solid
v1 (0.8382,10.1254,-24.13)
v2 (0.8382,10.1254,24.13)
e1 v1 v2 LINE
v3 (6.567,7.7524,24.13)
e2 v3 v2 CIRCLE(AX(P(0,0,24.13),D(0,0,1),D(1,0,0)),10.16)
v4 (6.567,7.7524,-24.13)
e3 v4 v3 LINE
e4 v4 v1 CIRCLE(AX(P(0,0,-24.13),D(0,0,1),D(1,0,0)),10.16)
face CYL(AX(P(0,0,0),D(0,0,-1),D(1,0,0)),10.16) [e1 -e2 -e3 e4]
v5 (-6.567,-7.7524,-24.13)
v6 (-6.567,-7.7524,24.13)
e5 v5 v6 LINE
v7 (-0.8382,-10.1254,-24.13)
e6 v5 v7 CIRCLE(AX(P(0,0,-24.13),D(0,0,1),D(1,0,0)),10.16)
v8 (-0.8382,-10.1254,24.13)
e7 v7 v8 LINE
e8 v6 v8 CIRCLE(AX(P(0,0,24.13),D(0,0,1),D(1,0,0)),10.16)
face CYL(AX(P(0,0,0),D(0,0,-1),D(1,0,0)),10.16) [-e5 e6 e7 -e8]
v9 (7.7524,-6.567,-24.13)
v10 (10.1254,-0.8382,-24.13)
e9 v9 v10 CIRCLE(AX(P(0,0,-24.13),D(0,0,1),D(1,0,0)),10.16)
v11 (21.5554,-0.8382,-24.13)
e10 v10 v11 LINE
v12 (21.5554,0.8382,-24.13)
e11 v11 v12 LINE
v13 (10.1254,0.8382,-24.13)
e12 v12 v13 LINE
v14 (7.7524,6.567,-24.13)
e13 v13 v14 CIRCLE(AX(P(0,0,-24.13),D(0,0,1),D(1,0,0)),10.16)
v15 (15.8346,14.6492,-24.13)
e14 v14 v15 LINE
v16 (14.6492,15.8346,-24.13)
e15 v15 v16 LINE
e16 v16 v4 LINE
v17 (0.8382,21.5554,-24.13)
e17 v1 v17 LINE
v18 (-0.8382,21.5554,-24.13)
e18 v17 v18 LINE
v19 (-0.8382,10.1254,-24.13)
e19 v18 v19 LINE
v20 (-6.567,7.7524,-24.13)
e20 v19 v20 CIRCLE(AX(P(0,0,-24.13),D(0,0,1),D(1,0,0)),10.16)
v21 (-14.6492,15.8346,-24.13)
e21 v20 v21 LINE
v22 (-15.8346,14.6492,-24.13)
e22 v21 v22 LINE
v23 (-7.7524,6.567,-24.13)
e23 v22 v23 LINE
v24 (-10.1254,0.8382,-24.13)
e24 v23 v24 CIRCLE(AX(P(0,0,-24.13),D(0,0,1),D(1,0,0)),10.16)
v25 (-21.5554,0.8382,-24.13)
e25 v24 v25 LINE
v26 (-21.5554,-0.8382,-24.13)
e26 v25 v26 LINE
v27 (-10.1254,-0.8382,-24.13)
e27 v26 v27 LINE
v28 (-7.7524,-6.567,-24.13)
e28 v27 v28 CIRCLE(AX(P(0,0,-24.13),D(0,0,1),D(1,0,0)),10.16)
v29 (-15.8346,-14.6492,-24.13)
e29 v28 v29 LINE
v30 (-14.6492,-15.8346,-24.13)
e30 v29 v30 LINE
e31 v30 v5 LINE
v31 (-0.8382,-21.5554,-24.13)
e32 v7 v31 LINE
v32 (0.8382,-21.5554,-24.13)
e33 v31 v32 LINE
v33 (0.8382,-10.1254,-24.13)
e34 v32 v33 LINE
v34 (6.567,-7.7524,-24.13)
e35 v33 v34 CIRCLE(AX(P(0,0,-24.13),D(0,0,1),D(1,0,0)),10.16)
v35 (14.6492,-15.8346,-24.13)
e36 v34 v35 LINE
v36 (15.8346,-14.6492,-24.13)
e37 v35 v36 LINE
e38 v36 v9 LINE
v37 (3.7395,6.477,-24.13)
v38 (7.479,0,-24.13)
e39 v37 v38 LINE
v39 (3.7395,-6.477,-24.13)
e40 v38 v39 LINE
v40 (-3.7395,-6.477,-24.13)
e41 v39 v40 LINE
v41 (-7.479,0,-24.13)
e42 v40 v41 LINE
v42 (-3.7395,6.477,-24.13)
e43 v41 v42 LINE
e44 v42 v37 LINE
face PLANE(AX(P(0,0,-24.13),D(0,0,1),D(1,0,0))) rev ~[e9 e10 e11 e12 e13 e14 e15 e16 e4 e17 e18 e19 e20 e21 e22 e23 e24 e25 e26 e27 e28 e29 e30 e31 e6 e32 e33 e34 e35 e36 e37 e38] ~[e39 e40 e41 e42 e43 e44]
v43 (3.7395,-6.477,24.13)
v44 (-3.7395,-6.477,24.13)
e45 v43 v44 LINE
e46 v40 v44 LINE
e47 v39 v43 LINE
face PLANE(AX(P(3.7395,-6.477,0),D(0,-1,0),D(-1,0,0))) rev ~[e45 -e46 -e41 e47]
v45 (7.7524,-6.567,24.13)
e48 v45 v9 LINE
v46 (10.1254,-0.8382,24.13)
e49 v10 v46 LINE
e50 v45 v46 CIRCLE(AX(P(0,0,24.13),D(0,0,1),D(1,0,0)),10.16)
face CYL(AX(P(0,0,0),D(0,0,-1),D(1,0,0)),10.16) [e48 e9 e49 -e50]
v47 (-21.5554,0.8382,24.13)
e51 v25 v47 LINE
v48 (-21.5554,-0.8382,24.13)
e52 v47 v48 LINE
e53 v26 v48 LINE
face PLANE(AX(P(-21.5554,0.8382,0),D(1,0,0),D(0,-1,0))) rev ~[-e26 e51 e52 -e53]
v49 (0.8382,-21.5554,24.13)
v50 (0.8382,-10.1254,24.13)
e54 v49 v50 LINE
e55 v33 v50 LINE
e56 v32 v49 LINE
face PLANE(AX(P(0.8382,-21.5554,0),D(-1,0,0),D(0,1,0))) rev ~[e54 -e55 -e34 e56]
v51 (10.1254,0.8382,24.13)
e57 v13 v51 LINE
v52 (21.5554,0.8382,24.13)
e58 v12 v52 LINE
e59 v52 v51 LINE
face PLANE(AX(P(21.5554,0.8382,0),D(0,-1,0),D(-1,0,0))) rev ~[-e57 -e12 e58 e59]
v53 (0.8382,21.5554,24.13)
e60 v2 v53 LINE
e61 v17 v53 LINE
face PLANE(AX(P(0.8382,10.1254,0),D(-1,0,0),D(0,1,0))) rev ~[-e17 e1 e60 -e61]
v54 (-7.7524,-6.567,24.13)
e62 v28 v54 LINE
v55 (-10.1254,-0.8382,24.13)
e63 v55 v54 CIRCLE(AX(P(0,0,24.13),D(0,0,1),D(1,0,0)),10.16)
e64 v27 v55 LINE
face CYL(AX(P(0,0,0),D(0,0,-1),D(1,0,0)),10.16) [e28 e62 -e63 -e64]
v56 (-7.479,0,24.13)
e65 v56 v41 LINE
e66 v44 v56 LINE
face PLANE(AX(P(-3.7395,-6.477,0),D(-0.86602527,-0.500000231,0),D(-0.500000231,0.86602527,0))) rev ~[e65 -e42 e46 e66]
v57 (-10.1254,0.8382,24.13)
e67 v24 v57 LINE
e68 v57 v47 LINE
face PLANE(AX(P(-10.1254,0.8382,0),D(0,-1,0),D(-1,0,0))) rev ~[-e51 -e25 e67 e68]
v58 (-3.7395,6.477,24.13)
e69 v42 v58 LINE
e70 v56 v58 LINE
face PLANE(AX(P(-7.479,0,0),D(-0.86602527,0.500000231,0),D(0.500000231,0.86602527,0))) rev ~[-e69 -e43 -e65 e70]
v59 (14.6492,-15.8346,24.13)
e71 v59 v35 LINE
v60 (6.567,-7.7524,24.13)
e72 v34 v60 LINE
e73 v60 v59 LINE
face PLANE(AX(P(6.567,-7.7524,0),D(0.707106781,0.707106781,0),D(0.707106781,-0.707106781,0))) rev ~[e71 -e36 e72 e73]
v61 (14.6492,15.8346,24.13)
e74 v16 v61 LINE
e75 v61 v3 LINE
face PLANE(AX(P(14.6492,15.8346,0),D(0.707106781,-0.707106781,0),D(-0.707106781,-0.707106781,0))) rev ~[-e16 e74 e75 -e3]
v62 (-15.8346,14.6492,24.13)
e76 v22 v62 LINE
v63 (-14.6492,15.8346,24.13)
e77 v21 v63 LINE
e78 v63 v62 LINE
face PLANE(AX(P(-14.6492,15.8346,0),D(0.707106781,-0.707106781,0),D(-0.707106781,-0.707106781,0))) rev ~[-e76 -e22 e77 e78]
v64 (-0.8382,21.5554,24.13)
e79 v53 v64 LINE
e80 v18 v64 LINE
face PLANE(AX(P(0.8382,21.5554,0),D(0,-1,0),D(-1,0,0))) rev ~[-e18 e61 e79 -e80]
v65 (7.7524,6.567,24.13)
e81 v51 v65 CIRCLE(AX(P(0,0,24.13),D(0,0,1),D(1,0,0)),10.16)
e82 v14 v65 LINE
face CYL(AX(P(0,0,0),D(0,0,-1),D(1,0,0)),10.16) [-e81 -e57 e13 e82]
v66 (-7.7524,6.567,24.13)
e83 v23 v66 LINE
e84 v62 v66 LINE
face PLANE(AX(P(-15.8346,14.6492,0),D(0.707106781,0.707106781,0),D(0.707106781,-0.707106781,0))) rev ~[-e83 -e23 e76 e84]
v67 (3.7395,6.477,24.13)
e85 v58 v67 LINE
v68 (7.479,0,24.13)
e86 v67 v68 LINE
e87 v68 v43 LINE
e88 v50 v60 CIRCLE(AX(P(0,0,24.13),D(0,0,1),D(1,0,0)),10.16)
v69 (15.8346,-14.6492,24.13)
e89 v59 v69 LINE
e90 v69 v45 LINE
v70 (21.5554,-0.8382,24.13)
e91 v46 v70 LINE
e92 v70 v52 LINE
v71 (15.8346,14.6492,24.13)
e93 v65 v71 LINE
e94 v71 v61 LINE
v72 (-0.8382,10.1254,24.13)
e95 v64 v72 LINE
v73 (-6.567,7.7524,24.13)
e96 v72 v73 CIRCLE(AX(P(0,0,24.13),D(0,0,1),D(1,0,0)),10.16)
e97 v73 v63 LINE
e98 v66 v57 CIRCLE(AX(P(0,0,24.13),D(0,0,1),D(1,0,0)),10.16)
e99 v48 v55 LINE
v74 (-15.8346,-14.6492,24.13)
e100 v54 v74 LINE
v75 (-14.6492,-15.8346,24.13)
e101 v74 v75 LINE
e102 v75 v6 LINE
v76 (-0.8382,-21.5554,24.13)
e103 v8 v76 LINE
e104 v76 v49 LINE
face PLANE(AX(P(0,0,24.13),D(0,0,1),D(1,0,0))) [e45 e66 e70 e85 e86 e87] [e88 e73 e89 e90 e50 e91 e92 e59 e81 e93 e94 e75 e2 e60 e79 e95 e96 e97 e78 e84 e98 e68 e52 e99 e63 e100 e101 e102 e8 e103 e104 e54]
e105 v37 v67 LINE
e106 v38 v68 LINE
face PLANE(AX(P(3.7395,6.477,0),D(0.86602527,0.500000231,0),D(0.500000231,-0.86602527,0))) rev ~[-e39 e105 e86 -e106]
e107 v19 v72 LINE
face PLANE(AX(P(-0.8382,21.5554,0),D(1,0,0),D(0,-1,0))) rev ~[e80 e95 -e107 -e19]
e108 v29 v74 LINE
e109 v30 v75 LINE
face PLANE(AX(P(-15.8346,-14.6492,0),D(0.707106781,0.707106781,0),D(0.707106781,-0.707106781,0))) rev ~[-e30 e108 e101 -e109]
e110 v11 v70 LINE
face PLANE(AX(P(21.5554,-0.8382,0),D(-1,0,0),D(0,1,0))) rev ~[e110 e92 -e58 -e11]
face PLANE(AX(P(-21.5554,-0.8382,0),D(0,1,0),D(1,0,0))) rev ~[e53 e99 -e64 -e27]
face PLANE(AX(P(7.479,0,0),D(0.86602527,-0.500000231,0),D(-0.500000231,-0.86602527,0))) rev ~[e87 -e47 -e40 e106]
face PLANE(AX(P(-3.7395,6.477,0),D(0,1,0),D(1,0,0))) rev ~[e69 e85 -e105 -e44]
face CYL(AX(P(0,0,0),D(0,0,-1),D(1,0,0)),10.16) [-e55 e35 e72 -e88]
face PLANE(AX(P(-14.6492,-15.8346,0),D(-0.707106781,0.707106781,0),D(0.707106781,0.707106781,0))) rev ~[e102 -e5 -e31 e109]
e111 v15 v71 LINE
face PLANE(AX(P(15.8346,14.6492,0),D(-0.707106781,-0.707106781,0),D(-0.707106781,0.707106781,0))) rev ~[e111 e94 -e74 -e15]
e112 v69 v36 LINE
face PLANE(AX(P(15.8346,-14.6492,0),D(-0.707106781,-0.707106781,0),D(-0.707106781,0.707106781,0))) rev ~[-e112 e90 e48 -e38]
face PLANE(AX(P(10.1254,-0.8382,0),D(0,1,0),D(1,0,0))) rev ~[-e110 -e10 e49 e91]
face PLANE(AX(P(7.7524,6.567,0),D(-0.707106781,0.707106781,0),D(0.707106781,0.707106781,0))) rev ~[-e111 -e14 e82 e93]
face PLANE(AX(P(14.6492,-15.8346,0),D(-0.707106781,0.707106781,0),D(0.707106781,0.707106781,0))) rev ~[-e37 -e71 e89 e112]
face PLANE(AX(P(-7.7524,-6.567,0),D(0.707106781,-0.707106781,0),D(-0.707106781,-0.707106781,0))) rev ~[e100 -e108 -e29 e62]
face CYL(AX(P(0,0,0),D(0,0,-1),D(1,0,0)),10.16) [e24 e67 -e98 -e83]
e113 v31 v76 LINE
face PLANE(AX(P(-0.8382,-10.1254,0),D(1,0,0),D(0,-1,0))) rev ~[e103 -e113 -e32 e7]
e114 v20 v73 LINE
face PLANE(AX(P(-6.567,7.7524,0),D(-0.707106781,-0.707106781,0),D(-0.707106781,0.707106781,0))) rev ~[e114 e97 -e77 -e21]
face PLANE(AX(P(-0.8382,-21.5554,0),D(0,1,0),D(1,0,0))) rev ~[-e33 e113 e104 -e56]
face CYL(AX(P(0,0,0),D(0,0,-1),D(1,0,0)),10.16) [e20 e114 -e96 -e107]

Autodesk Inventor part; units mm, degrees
ref_plane "YZ Plane" through (0, 0, 0) normal (1, 0, 0) x (0, 1, 0)
ref_plane "XZ Plane" through (0, 0, 0) normal (0, 1, 0) x (-1, 0, 0)
ref_plane "XY Plane" through (0, 0, 0) normal (0, 0, 1) x (1, 0, 0)
sketch "Sketch1" plane through (0, 0, 0) normal (0, 0, 1) x (1, 0, 0)
  circle A0 centre (0, 0) radius 10.16
  circle A1 centre (0, 0) radius 8.5725
  line L0 (0.8382, 10.1254) -> (0.8382, 21.5554)
  line L1 (0.8382, 21.5554) -> (-0.8382, 21.5554)
  line L2 (-0.8382, 21.5554) -> (-0.8382, 10.1254)
  line L3 (-15.8346, 14.6492) -> (-7.7524, 6.567)
  line L4 (-14.6492, 15.8346) -> (-15.8346, 14.6492)
  line L5 (-6.567, 7.7524) -> (-14.6492, 15.8346)
  line L6 (-21.5554, -0.8382) -> (-10.1254, -0.8382)
  line L7 (-21.5554, 0.8382) -> (-21.5554, -0.8382)
  line L8 (-10.1254, 0.8382) -> (-21.5554, 0.8382)
  line L9 (-14.6492, -15.8346) -> (-6.567, -7.7524)
  line L10 (-15.8346, -14.6492) -> (-14.6492, -15.8346)
  line L11 (-7.7524, -6.567) -> (-15.8346, -14.6492)
  line L12 (0.8382, -21.5554) -> (0.8382, -10.1254)
  line L13 (-0.8382, -21.5554) -> (0.8382, -21.5554)
  line L14 (-0.8382, -10.1254) -> (-0.8382, -21.5554)
  line L15 (15.8346, -14.6492) -> (7.7524, -6.567)
  line L16 (14.6492, -15.8346) -> (15.8346, -14.6492)
  line L17 (6.567, -7.7524) -> (14.6492, -15.8346)
  line L18 (21.5554, 0.8382) -> (10.1254, 0.8382)
  line L19 (21.5554, -0.8382) -> (21.5554, 0.8382)
  line L20 (10.1254, -0.8382) -> (21.5554, -0.8382)
  line L21 (14.6492, 15.8346) -> (6.567, 7.7524)
  line L22 (15.8346, 14.6492) -> (14.6492, 15.8346)
  line L23 (7.7524, 6.567) -> (15.8346, 14.6492)
  line L24 (-7.479, 0) -> (-3.7395, 6.477)
  line L25 (-3.7395, 6.477) -> (3.7395, 6.477)
  line L26 (3.7395, 6.477) -> (7.479, 0)
  line L27 (7.479, 0) -> (3.7395, -6.477)
  line L28 (3.7395, -6.477) -> (-3.7395, -6.477)
  line L29 (-3.7395, -6.477) -> (-7.479, 0)
  point P0 (0, 21.5554)
  point P1 (-15.2419, 15.2419)
  point P2 (-21.5554, 0)
  point P3 (-15.2419, -15.2419)
  point P4 (0, -21.5554)
  point P5 (15.2419, -15.2419)
  point P6 (21.5554, 0)
  point P7 (15.2419, 15.2419)
  point P8 (-10.1254, -0.8382)
  point P9 (-10.1254, 0.8382)
  point P10 (-6.567, -7.7524)
  point P11 (-7.7524, -6.567)
  point P12 (0.8382, -10.1254)
  point P13 (-0.8382, -10.1254)
  point P14 (7.7524, -6.567)
  point P15 (6.567, -7.7524)
  point P16 (10.1254, 0.8382)
  point P17 (10.1254, -0.8382)
  point P18 (6.567, 7.7524)
  point P19 (7.7524, 6.567)
  point P20 (-7.7524, 6.567)
  point P21 (-6.567, 7.7524)
  dimension "d0" = 20.32
  dimension "d1" = 1.5875
  dimension "d7" = 1.6764
  dimension "d11" = 360
  dimension "d13" = 11.43
  dimension "d17" = 12.954
extrude "Extrusion1" add sketch "Sketch1" along normal mid plane 48.26 contours A0 | A0 L18 L19 L20 | A0 L21 L22 L23 | L15 L16 L17 A0 | A0 L2 L1 L0 | L12 L13 L14 A0 | A0 L3 L4 L5 | L9 L10 L11 A0 | A0 L6 L7 L8 | A1
properties part number "Spiral"
